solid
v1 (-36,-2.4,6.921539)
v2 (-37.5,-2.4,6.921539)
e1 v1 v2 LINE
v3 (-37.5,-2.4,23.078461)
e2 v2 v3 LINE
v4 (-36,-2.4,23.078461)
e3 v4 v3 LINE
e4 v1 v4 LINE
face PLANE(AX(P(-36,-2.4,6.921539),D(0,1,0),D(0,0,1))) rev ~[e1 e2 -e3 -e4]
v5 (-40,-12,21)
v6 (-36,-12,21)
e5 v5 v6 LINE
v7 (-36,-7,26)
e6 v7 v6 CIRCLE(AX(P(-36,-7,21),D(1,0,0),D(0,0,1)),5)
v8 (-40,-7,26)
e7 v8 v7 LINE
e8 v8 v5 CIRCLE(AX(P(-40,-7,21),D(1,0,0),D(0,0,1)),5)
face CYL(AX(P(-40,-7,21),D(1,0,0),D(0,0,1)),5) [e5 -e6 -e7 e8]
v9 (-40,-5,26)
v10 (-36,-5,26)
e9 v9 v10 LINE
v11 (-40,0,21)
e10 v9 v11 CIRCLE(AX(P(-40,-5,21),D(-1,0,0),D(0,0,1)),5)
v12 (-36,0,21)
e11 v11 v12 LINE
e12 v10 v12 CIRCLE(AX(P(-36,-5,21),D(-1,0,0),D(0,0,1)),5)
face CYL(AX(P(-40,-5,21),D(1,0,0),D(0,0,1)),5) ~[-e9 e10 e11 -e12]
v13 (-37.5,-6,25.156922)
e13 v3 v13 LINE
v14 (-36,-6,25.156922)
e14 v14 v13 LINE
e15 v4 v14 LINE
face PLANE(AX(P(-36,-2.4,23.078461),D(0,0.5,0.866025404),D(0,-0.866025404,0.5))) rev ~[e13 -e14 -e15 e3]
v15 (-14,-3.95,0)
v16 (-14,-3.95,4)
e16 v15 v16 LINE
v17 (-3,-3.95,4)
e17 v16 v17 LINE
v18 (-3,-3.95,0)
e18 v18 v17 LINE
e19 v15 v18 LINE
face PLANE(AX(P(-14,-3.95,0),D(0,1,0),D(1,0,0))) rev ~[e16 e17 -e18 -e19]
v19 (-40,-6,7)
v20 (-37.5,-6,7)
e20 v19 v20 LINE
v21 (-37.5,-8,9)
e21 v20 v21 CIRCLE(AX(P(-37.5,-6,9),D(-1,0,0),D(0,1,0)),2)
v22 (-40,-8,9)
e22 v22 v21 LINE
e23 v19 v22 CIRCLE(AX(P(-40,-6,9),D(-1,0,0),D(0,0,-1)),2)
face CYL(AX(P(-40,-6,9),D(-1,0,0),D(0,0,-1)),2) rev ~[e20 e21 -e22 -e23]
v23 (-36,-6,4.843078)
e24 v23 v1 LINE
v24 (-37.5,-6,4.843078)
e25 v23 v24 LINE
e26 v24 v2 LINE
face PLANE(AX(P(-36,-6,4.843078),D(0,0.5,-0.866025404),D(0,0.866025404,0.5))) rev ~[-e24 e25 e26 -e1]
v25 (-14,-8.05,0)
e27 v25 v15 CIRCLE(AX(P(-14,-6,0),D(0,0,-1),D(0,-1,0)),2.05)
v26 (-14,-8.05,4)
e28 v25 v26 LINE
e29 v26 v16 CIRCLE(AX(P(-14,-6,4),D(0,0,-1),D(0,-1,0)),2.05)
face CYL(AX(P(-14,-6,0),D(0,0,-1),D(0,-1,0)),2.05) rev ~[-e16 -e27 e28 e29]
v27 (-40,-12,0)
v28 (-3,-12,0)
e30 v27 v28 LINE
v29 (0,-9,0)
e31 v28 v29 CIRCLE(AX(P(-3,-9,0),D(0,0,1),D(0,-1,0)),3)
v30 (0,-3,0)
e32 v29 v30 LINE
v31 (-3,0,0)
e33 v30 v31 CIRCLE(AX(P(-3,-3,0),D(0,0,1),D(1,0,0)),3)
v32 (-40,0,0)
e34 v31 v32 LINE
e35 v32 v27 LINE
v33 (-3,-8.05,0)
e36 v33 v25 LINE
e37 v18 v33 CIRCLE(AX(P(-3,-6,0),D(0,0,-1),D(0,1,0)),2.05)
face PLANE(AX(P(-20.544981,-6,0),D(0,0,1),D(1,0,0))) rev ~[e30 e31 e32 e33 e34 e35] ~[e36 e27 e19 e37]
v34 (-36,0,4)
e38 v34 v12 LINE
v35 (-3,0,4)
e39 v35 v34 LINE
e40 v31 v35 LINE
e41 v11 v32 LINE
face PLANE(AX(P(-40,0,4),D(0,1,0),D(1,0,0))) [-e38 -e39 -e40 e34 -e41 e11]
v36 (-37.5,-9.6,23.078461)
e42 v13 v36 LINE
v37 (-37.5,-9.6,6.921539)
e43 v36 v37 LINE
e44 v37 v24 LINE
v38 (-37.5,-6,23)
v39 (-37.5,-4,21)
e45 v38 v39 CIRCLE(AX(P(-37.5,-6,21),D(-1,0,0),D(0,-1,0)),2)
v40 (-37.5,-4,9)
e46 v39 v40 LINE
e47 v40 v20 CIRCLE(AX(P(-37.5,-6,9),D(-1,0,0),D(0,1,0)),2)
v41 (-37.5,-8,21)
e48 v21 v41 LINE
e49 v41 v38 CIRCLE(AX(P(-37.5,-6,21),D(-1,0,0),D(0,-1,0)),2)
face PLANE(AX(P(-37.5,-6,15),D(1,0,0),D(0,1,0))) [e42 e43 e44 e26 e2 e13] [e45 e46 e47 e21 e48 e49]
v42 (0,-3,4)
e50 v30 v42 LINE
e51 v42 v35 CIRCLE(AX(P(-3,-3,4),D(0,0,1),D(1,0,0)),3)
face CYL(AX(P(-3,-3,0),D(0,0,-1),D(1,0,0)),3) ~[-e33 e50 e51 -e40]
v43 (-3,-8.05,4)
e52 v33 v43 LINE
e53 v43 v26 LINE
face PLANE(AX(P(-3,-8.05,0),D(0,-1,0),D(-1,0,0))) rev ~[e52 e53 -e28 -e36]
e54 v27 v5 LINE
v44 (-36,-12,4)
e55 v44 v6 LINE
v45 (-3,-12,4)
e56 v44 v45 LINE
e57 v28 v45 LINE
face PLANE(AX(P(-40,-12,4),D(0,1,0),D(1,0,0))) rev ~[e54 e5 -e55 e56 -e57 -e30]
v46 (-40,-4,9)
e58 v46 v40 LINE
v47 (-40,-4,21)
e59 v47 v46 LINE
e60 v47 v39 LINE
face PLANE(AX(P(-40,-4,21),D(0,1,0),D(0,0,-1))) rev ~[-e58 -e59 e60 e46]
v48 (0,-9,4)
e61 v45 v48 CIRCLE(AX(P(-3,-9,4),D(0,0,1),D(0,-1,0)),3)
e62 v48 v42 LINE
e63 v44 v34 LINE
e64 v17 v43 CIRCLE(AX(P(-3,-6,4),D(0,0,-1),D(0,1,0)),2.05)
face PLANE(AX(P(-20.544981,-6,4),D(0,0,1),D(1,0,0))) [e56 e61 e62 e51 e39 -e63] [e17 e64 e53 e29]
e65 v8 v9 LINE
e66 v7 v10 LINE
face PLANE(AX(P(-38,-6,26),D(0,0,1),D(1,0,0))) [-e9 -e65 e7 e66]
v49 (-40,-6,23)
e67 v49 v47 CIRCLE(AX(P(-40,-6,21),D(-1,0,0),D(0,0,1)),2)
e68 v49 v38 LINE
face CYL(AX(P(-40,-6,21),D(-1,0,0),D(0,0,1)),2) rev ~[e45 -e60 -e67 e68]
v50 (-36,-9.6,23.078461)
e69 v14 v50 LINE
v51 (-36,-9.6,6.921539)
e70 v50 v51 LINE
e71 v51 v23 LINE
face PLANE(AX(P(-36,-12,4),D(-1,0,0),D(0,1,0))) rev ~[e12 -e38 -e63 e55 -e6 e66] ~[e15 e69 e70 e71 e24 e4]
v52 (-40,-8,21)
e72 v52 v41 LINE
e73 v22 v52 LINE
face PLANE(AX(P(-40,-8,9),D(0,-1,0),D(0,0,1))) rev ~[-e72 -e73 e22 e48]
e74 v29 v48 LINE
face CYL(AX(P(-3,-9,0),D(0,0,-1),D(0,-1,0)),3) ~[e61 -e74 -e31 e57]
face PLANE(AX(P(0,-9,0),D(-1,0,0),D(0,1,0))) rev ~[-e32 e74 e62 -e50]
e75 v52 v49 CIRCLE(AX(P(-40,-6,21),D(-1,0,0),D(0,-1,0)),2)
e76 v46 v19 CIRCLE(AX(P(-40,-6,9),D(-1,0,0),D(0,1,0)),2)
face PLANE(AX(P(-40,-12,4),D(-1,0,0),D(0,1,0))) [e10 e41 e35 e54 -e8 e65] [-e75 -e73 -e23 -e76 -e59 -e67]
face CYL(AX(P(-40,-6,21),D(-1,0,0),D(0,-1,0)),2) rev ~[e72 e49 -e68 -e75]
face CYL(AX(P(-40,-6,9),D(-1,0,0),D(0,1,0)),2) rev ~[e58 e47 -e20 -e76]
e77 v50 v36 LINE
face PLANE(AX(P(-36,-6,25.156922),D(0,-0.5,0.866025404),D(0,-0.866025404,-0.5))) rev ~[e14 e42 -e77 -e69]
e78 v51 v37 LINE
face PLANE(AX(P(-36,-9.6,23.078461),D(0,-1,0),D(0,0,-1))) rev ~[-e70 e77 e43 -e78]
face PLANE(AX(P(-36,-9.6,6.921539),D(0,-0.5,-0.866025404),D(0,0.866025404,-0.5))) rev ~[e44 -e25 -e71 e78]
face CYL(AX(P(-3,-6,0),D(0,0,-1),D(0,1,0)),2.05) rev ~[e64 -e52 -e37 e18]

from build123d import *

# Parameters (mm, degrees)
F1_DEPTH = 4
F2_W     = 4
F2_H     = 12
F3_DEPTH = 22
F5_DEPTH = 25
F7_DEPTH = 1.5
F8_R     = 5


# Not quite as in the source:
# - a feature names something its author has since deleted; it is built from what else it names


with BuildPart() as f1:
    # F0 (on Top) → F1 (new body)
    with BuildSketch(Plane.XY):
        with BuildLine():
            ThreePointArc((0, -3), (-0.8786796564, -0.8786796564), (-3, 0))
            Line((-3, 0), (-40, 0))
            Line((-40, 0), (-40, -12))
            Line((-40, -12), (-3, -12))
            ThreePointArc((-3, -12), (-0.8786796564, -11.1213203436), (0, -9))
            Line((0, -9), (0, -3))
        make_face()
        with BuildLine():
            ThreePointArc((-3, -3.95), (-0.95, -6), (-3, -8.05))
            Line((-3, -8.05), (-14, -8.05))
            ThreePointArc((-14, -8.05), (-16.05, -6), (-14, -3.95))
            Line((-14, -3.95), (-3, -3.95))
        make_face(mode=Mode.SUBTRACT)
    extrude(amount=F1_DEPTH)

    # F2 (on face) → F3 (join)
    with BuildSketch(Plane.XY.offset(4)):
        with Locations((-38, -6)):
            Rectangle(F2_W, F2_H)
    extrude(amount=F3_DEPTH)

    # F4 (on face) → F5 (cut)
    with BuildSketch(Plane(origin=(-40, 0, 0), x_dir=(0, -1, 0), z_dir=(-1, 0, 0))):
        with BuildLine():
            Line((4, 21), (4, 9))
            ThreePointArc((4, 9), (4.5857864376, 7.5857864376), (6, 7))
            ThreePointArc((6, 7), (7.4142135624, 7.5857864376), (8, 9))
            Line((8, 9), (8, 21))
            ThreePointArc((8, 21), (7.4142135624, 22.4142135624), (6, 23))
            ThreePointArc((6, 23), (4.5857864376, 22.4142135624), (4, 21))
        make_face()
    extrude(amount=-F5_DEPTH, mode=Mode.SUBTRACT)

    # F6 (on face) → F7 (cut)
    with BuildSketch(Plane.YZ.offset(-36)):
        Polygon((-6, 4.8430780618), (-2.4, 6.9215390309), (-2.4, 23.0784609691), (-6, 25.1569219382), (-9.6, 23.0784609691), (-9.6, 6.9215390309), align=None)
        with BuildLine():
            ThreePointArc((-8, 21), (-6, 23), (-4, 21))
            Line((-4, 21), (-4, 9))
            ThreePointArc((-4, 9), (-6, 7), (-8, 9))
            Line((-8, 9), (-8, 21))
        make_face(mode=Mode.SUBTRACT)
    extrude(amount=-F7_DEPTH, mode=Mode.SUBTRACT)

    # F8
    f8_edges = [f1.edges().sort_by_distance(p)[0] for p in [
        (-38, -12, 26),
        (-38, 0, 26),
    ]]
    fillet(f8_edges, radius=F8_R)


solid = f1.part
